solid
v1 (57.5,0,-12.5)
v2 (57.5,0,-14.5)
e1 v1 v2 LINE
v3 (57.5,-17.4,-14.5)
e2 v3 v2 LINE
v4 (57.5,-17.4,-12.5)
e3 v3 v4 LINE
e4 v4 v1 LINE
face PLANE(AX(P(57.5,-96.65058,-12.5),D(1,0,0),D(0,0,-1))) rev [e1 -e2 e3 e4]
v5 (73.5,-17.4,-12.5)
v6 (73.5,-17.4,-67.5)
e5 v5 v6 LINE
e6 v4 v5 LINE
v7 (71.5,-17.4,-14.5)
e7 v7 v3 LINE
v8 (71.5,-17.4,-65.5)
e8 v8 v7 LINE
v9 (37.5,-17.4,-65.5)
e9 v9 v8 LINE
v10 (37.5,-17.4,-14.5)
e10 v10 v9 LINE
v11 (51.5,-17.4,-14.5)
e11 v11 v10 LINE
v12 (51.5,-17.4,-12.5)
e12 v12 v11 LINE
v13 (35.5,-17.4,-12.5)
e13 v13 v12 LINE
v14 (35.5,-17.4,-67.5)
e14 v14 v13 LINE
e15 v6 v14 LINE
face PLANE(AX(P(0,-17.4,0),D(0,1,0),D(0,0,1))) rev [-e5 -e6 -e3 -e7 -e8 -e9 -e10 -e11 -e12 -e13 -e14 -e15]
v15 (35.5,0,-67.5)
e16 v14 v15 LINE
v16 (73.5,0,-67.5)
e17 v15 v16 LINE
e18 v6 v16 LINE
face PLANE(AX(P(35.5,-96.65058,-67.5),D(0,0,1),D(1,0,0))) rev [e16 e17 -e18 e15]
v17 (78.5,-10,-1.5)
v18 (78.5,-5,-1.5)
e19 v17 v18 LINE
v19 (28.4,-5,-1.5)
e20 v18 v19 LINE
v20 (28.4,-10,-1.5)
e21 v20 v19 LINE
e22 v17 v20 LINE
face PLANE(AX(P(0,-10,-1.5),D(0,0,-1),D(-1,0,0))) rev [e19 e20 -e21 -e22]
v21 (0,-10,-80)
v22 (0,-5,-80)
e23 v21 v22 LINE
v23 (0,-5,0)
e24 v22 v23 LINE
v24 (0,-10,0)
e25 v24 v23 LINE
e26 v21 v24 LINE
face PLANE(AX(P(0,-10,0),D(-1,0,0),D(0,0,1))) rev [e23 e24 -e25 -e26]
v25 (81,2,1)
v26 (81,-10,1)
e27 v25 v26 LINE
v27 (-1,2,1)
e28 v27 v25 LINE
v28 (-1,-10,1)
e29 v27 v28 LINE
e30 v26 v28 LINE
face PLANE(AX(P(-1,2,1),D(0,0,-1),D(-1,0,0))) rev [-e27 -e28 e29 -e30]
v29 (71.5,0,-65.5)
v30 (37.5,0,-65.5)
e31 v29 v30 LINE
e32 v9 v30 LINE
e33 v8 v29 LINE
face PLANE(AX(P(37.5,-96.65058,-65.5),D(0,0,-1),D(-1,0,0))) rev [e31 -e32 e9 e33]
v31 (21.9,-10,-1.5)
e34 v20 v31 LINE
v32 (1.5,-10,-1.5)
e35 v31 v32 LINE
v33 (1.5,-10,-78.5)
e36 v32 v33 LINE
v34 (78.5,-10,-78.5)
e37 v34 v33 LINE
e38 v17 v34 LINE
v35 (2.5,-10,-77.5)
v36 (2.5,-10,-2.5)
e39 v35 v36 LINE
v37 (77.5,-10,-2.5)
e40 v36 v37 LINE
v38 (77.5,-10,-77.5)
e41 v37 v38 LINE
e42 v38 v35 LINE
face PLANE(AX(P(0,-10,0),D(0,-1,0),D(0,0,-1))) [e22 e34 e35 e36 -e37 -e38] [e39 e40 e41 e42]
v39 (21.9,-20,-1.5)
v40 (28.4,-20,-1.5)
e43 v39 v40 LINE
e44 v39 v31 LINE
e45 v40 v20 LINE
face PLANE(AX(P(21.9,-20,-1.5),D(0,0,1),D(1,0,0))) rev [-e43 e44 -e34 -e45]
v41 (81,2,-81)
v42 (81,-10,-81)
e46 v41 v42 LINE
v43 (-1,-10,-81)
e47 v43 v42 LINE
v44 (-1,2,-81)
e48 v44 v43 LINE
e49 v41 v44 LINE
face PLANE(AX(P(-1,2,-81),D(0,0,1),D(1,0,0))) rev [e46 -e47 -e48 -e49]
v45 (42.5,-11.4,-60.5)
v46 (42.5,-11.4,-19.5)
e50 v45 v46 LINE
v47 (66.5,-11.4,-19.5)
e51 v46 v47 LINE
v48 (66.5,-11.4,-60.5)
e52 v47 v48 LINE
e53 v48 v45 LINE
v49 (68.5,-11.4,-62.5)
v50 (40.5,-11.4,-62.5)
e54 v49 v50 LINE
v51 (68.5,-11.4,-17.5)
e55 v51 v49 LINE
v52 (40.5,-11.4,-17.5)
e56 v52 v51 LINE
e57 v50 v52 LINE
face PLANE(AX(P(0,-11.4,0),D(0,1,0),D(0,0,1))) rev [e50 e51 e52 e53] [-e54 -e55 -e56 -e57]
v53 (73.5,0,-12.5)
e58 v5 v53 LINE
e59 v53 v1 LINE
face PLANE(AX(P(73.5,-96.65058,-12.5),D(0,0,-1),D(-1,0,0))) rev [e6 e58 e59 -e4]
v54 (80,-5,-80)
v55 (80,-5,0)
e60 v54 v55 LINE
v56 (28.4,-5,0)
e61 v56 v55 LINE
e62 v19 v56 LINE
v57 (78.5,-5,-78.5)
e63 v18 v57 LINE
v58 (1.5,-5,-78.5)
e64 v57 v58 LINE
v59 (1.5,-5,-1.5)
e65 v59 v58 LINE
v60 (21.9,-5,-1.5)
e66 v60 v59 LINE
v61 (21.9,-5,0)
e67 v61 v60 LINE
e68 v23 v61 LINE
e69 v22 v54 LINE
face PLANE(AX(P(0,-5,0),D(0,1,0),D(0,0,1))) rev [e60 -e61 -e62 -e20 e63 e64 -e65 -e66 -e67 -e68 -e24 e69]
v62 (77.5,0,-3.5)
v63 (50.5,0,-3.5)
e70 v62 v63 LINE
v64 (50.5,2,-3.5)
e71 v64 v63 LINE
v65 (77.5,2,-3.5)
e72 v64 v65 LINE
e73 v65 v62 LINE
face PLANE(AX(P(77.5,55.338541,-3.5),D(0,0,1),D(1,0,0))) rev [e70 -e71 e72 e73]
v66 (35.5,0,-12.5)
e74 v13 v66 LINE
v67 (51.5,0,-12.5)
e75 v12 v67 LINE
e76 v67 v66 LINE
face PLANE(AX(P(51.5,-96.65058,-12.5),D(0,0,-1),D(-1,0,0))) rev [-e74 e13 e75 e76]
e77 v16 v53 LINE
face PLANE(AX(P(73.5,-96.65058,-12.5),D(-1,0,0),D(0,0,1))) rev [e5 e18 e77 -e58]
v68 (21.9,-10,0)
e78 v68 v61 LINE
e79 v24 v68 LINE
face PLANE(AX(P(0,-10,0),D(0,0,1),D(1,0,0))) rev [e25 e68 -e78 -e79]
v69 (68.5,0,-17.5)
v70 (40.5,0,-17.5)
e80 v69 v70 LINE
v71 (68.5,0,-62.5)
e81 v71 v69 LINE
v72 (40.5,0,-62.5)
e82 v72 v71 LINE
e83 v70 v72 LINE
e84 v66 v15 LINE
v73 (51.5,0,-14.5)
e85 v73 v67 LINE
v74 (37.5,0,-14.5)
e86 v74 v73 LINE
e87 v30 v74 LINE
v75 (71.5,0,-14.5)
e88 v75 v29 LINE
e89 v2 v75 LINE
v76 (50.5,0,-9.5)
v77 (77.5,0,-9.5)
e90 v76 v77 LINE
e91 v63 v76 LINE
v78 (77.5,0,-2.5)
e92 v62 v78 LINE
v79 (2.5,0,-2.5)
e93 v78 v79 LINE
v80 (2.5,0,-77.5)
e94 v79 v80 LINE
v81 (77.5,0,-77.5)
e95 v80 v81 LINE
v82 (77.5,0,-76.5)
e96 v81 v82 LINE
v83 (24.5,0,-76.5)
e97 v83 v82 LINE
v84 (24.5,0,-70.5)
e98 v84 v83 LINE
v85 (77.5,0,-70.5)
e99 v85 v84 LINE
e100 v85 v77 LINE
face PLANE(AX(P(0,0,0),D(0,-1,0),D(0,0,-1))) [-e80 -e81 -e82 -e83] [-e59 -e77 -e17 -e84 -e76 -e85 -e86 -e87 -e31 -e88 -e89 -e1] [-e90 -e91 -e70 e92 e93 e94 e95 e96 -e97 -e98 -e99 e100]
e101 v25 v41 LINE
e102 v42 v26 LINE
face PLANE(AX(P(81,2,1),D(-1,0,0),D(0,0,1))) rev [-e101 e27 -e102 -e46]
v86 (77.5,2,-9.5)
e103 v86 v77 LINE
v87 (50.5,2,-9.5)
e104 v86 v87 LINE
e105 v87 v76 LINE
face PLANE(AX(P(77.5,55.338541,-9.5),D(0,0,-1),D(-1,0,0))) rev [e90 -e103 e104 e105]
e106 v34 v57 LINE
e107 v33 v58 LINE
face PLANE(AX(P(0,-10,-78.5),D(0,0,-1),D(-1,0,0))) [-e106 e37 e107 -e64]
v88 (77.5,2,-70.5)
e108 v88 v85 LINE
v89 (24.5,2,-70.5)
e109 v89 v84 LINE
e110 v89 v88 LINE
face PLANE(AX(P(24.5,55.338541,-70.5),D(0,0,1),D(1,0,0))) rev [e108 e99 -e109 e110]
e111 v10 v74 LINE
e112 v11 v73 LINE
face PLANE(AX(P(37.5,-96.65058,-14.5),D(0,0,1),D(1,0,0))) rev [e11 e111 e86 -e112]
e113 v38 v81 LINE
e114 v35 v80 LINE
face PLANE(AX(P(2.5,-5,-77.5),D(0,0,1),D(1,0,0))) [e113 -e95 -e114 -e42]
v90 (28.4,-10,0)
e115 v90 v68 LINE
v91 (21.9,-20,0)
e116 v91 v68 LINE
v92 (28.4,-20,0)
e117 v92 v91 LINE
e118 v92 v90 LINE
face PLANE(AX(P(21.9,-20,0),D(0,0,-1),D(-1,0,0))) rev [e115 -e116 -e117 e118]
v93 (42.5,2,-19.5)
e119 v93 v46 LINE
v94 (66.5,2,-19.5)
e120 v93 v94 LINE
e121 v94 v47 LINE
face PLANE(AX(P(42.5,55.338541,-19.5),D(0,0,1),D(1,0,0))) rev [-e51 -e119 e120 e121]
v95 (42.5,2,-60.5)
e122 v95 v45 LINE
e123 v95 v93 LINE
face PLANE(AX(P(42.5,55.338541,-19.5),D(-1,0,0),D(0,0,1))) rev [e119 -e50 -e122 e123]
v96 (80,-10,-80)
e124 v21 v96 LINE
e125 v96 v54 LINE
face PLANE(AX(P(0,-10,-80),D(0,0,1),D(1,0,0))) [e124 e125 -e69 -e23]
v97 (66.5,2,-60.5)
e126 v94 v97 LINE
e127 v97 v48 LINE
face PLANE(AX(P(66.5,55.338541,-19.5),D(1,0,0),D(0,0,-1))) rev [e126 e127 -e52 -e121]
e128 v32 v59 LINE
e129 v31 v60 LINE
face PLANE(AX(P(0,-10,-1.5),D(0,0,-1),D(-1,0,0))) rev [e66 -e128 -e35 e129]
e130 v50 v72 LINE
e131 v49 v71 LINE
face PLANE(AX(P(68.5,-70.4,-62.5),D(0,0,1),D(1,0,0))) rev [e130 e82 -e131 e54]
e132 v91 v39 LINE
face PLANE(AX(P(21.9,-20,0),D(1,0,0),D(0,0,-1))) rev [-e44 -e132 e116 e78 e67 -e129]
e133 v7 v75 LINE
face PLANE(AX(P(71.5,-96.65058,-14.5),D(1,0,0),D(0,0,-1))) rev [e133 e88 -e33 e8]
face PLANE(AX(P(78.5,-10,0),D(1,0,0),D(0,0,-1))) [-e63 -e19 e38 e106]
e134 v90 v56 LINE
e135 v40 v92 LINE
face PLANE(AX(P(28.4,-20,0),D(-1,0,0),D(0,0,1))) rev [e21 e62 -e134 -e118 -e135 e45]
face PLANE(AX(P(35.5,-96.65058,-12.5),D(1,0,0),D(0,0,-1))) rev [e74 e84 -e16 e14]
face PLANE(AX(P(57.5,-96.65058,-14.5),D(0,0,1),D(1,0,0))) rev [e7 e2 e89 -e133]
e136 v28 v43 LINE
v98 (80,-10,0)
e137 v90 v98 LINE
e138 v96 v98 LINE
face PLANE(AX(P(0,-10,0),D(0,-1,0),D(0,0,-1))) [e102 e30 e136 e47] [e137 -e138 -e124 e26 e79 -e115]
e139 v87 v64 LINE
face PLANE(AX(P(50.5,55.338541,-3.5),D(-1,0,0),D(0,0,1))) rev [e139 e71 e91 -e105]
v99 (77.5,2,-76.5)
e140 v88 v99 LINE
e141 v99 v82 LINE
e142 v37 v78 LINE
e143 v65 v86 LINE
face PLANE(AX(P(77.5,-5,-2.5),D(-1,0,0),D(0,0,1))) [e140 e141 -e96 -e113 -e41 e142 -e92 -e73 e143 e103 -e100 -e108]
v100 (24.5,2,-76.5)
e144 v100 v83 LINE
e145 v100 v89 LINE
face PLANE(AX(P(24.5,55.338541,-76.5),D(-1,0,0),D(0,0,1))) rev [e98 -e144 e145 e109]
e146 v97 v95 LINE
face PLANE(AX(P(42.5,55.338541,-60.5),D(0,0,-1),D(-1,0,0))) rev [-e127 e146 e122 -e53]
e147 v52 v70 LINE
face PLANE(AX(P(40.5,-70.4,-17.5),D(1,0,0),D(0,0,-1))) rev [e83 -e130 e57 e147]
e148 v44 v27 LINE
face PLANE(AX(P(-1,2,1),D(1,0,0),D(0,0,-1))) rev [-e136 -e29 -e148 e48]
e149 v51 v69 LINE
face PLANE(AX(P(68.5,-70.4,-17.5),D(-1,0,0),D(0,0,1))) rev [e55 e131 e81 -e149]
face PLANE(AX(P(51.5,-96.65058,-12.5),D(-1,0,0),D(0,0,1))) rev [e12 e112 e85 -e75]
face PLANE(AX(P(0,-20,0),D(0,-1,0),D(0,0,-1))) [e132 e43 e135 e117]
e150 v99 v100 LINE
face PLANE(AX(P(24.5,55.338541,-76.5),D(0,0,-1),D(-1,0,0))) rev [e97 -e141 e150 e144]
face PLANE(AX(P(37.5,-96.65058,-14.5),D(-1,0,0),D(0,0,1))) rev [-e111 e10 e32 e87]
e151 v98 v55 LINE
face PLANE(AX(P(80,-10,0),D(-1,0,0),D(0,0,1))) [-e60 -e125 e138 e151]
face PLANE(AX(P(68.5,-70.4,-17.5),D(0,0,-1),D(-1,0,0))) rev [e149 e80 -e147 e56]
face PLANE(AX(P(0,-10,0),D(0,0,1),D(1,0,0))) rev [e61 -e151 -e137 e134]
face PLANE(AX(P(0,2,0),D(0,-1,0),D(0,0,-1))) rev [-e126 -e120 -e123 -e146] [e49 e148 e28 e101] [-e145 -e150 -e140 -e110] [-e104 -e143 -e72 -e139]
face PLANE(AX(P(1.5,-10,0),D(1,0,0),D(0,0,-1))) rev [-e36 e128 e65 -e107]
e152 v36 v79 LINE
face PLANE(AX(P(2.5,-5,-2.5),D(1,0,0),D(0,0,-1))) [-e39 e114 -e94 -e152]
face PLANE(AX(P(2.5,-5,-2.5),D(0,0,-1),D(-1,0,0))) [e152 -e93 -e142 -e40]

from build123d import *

# Parameters (mm, degrees)
SKETCH5_W                 = 82
SKETCH5_H                 = 82
BOSS_EXTRUDE3_DEPTH       = 2
SKETCH9_W                 = 82
SKETCH9_H                 = 82
SKETCH9_W_2               = 75
SKETCH9_H_2               = 75
BOSS_EXTRUDE5_DEPTH       = 5
BOSS_EXTRUDE4_DEPTH       = 17.4
SKETCH7_W                 = 24
SKETCH7_H                 = 41
SKETCH7_W_2               = 27
SKETCH7_H_2               = 6
SKETCH7_W_3               = 53
CUT_EXTRUDE1_DEPTH        = 2
SKETCH10_W                = 6.5
SKETCH10_H                = 1.5
BOSS_EXTRUDE6_DEPTH       = 15
BOSS_EXTRUDE7_OUTLINE_W   = 82
BOSS_EXTRUDE7_OUTLINE_H   = 82
BOSS_EXTRUDE7_OUTLINE_W_2 = 80
BOSS_EXTRUDE7_OUTLINE_H_2 = 80
BOSS_EXTRUDE7_OUTLINE_W_3 = 77
BOSS_EXTRUDE7_OUTLINE_H_3 = 77
BOSS_EXTRUDE7_OUTLINE_W_4 = 75
BOSS_EXTRUDE7_OUTLINE_H_4 = 75
BOSS_EXTRUDE7_DEPTH       = 5
SKETCH12_W                = 28
SKETCH12_H                = 45
SKETCH12_W_2              = 24
SKETCH12_H_2              = 41
BOSS_EXTRUDE8_DEPTH       = 11.4


# Read off the part's stored shape, not the designer's step: Boss-Extrude7
with BuildPart() as part:
    # Sketch5 → Boss-Extrude3 (new body)
    with BuildSketch(Plane(origin=(0, 0, 0), x_dir=(1, 0, 0), z_dir=(0, 1, 0))):
        with Locations((40, 40)):
            Rectangle(SKETCH5_W, SKETCH5_H)
    extrude(amount=BOSS_EXTRUDE3_DEPTH)

    # Sketch9 → Boss-Extrude5 (add)
    with BuildSketch(Plane.XZ):
        with Locations((40, -40)):
            Rectangle(SKETCH9_W, SKETCH9_H)
        with Locations((40, -40)):
            Rectangle(SKETCH9_W_2, SKETCH9_H_2, mode=Mode.SUBTRACT)
    extrude(amount=BOSS_EXTRUDE5_DEPTH)

    # Sketch6 → Boss-Extrude4 (add)
    with BuildSketch(Plane.XZ):
        Polygon((35.5, -12.5), (35.5, -67.5), (73.5, -67.5), (73.5, -12.5), (57.5, -12.5), (57.5, -14.5), (71.5, -14.5), (71.5, -65.5), (37.5, -65.5), (37.5, -14.5), (51.5, -14.5), (51.5, -12.5), align=None)
    extrude(amount=BOSS_EXTRUDE4_DEPTH)

    # Sketch7 → Cut-Extrude1 (cut)
    with BuildSketch(Plane.XZ):
        with Locations((54.5, -40)):
            Rectangle(SKETCH7_W, SKETCH7_H)
        with Locations((64, -6.5)):
            Rectangle(SKETCH7_W_2, SKETCH7_H_2)
        with Locations((51, -73.5)):
            Rectangle(SKETCH7_W_3, SKETCH7_H_2)
    extrude(amount=-CUT_EXTRUDE1_DEPTH, mode=Mode.SUBTRACT)

    # Sketch10 → Boss-Extrude6 (add)
    with BuildSketch(Plane.XZ.offset(5)):
        with Locations((25.15, -0.75)):
            Rectangle(SKETCH10_W, SKETCH10_H)
    extrude(amount=BOSS_EXTRUDE6_DEPTH)

    # Boss-Extrude7 outline → Boss-Extrude7 (add)
    # profile 1 of 2: a face of its own
    with BuildSketch(Plane(origin=(0, -5, 0), x_dir=(-1, 0, 0), z_dir=(0, -1, 0))):
        with Locations((-40, 40)):
            Rectangle(BOSS_EXTRUDE7_OUTLINE_W, BOSS_EXTRUDE7_OUTLINE_H)
        with Locations((-40, 40)):
            Rectangle(BOSS_EXTRUDE7_OUTLINE_W_2, BOSS_EXTRUDE7_OUTLINE_H_2, mode=Mode.SUBTRACT)
    # profile 2 of 2: a face of its own
    with BuildSketch(Plane(origin=(0, -5, 0), x_dir=(-1, 0, 0), z_dir=(0, -1, 0))):
        with Locations((-40, 40)):
            Rectangle(BOSS_EXTRUDE7_OUTLINE_W_3, BOSS_EXTRUDE7_OUTLINE_H_3)
        with Locations((-40, 40)):
            Rectangle(BOSS_EXTRUDE7_OUTLINE_W_4, BOSS_EXTRUDE7_OUTLINE_H_4, mode=Mode.SUBTRACT)
    extrude(amount=BOSS_EXTRUDE7_DEPTH)

    # Sketch12 → Boss-Extrude8 (add)
    with BuildSketch(Plane.XZ):
        with Locations((54.5, -40)):
            Rectangle(SKETCH12_W, SKETCH12_H)
        with Locations((54.5, -40)):
            Rectangle(SKETCH12_W_2, SKETCH12_H_2, mode=Mode.SUBTRACT)
    extrude(amount=BOSS_EXTRUDE8_DEPTH)


solid = part.part
